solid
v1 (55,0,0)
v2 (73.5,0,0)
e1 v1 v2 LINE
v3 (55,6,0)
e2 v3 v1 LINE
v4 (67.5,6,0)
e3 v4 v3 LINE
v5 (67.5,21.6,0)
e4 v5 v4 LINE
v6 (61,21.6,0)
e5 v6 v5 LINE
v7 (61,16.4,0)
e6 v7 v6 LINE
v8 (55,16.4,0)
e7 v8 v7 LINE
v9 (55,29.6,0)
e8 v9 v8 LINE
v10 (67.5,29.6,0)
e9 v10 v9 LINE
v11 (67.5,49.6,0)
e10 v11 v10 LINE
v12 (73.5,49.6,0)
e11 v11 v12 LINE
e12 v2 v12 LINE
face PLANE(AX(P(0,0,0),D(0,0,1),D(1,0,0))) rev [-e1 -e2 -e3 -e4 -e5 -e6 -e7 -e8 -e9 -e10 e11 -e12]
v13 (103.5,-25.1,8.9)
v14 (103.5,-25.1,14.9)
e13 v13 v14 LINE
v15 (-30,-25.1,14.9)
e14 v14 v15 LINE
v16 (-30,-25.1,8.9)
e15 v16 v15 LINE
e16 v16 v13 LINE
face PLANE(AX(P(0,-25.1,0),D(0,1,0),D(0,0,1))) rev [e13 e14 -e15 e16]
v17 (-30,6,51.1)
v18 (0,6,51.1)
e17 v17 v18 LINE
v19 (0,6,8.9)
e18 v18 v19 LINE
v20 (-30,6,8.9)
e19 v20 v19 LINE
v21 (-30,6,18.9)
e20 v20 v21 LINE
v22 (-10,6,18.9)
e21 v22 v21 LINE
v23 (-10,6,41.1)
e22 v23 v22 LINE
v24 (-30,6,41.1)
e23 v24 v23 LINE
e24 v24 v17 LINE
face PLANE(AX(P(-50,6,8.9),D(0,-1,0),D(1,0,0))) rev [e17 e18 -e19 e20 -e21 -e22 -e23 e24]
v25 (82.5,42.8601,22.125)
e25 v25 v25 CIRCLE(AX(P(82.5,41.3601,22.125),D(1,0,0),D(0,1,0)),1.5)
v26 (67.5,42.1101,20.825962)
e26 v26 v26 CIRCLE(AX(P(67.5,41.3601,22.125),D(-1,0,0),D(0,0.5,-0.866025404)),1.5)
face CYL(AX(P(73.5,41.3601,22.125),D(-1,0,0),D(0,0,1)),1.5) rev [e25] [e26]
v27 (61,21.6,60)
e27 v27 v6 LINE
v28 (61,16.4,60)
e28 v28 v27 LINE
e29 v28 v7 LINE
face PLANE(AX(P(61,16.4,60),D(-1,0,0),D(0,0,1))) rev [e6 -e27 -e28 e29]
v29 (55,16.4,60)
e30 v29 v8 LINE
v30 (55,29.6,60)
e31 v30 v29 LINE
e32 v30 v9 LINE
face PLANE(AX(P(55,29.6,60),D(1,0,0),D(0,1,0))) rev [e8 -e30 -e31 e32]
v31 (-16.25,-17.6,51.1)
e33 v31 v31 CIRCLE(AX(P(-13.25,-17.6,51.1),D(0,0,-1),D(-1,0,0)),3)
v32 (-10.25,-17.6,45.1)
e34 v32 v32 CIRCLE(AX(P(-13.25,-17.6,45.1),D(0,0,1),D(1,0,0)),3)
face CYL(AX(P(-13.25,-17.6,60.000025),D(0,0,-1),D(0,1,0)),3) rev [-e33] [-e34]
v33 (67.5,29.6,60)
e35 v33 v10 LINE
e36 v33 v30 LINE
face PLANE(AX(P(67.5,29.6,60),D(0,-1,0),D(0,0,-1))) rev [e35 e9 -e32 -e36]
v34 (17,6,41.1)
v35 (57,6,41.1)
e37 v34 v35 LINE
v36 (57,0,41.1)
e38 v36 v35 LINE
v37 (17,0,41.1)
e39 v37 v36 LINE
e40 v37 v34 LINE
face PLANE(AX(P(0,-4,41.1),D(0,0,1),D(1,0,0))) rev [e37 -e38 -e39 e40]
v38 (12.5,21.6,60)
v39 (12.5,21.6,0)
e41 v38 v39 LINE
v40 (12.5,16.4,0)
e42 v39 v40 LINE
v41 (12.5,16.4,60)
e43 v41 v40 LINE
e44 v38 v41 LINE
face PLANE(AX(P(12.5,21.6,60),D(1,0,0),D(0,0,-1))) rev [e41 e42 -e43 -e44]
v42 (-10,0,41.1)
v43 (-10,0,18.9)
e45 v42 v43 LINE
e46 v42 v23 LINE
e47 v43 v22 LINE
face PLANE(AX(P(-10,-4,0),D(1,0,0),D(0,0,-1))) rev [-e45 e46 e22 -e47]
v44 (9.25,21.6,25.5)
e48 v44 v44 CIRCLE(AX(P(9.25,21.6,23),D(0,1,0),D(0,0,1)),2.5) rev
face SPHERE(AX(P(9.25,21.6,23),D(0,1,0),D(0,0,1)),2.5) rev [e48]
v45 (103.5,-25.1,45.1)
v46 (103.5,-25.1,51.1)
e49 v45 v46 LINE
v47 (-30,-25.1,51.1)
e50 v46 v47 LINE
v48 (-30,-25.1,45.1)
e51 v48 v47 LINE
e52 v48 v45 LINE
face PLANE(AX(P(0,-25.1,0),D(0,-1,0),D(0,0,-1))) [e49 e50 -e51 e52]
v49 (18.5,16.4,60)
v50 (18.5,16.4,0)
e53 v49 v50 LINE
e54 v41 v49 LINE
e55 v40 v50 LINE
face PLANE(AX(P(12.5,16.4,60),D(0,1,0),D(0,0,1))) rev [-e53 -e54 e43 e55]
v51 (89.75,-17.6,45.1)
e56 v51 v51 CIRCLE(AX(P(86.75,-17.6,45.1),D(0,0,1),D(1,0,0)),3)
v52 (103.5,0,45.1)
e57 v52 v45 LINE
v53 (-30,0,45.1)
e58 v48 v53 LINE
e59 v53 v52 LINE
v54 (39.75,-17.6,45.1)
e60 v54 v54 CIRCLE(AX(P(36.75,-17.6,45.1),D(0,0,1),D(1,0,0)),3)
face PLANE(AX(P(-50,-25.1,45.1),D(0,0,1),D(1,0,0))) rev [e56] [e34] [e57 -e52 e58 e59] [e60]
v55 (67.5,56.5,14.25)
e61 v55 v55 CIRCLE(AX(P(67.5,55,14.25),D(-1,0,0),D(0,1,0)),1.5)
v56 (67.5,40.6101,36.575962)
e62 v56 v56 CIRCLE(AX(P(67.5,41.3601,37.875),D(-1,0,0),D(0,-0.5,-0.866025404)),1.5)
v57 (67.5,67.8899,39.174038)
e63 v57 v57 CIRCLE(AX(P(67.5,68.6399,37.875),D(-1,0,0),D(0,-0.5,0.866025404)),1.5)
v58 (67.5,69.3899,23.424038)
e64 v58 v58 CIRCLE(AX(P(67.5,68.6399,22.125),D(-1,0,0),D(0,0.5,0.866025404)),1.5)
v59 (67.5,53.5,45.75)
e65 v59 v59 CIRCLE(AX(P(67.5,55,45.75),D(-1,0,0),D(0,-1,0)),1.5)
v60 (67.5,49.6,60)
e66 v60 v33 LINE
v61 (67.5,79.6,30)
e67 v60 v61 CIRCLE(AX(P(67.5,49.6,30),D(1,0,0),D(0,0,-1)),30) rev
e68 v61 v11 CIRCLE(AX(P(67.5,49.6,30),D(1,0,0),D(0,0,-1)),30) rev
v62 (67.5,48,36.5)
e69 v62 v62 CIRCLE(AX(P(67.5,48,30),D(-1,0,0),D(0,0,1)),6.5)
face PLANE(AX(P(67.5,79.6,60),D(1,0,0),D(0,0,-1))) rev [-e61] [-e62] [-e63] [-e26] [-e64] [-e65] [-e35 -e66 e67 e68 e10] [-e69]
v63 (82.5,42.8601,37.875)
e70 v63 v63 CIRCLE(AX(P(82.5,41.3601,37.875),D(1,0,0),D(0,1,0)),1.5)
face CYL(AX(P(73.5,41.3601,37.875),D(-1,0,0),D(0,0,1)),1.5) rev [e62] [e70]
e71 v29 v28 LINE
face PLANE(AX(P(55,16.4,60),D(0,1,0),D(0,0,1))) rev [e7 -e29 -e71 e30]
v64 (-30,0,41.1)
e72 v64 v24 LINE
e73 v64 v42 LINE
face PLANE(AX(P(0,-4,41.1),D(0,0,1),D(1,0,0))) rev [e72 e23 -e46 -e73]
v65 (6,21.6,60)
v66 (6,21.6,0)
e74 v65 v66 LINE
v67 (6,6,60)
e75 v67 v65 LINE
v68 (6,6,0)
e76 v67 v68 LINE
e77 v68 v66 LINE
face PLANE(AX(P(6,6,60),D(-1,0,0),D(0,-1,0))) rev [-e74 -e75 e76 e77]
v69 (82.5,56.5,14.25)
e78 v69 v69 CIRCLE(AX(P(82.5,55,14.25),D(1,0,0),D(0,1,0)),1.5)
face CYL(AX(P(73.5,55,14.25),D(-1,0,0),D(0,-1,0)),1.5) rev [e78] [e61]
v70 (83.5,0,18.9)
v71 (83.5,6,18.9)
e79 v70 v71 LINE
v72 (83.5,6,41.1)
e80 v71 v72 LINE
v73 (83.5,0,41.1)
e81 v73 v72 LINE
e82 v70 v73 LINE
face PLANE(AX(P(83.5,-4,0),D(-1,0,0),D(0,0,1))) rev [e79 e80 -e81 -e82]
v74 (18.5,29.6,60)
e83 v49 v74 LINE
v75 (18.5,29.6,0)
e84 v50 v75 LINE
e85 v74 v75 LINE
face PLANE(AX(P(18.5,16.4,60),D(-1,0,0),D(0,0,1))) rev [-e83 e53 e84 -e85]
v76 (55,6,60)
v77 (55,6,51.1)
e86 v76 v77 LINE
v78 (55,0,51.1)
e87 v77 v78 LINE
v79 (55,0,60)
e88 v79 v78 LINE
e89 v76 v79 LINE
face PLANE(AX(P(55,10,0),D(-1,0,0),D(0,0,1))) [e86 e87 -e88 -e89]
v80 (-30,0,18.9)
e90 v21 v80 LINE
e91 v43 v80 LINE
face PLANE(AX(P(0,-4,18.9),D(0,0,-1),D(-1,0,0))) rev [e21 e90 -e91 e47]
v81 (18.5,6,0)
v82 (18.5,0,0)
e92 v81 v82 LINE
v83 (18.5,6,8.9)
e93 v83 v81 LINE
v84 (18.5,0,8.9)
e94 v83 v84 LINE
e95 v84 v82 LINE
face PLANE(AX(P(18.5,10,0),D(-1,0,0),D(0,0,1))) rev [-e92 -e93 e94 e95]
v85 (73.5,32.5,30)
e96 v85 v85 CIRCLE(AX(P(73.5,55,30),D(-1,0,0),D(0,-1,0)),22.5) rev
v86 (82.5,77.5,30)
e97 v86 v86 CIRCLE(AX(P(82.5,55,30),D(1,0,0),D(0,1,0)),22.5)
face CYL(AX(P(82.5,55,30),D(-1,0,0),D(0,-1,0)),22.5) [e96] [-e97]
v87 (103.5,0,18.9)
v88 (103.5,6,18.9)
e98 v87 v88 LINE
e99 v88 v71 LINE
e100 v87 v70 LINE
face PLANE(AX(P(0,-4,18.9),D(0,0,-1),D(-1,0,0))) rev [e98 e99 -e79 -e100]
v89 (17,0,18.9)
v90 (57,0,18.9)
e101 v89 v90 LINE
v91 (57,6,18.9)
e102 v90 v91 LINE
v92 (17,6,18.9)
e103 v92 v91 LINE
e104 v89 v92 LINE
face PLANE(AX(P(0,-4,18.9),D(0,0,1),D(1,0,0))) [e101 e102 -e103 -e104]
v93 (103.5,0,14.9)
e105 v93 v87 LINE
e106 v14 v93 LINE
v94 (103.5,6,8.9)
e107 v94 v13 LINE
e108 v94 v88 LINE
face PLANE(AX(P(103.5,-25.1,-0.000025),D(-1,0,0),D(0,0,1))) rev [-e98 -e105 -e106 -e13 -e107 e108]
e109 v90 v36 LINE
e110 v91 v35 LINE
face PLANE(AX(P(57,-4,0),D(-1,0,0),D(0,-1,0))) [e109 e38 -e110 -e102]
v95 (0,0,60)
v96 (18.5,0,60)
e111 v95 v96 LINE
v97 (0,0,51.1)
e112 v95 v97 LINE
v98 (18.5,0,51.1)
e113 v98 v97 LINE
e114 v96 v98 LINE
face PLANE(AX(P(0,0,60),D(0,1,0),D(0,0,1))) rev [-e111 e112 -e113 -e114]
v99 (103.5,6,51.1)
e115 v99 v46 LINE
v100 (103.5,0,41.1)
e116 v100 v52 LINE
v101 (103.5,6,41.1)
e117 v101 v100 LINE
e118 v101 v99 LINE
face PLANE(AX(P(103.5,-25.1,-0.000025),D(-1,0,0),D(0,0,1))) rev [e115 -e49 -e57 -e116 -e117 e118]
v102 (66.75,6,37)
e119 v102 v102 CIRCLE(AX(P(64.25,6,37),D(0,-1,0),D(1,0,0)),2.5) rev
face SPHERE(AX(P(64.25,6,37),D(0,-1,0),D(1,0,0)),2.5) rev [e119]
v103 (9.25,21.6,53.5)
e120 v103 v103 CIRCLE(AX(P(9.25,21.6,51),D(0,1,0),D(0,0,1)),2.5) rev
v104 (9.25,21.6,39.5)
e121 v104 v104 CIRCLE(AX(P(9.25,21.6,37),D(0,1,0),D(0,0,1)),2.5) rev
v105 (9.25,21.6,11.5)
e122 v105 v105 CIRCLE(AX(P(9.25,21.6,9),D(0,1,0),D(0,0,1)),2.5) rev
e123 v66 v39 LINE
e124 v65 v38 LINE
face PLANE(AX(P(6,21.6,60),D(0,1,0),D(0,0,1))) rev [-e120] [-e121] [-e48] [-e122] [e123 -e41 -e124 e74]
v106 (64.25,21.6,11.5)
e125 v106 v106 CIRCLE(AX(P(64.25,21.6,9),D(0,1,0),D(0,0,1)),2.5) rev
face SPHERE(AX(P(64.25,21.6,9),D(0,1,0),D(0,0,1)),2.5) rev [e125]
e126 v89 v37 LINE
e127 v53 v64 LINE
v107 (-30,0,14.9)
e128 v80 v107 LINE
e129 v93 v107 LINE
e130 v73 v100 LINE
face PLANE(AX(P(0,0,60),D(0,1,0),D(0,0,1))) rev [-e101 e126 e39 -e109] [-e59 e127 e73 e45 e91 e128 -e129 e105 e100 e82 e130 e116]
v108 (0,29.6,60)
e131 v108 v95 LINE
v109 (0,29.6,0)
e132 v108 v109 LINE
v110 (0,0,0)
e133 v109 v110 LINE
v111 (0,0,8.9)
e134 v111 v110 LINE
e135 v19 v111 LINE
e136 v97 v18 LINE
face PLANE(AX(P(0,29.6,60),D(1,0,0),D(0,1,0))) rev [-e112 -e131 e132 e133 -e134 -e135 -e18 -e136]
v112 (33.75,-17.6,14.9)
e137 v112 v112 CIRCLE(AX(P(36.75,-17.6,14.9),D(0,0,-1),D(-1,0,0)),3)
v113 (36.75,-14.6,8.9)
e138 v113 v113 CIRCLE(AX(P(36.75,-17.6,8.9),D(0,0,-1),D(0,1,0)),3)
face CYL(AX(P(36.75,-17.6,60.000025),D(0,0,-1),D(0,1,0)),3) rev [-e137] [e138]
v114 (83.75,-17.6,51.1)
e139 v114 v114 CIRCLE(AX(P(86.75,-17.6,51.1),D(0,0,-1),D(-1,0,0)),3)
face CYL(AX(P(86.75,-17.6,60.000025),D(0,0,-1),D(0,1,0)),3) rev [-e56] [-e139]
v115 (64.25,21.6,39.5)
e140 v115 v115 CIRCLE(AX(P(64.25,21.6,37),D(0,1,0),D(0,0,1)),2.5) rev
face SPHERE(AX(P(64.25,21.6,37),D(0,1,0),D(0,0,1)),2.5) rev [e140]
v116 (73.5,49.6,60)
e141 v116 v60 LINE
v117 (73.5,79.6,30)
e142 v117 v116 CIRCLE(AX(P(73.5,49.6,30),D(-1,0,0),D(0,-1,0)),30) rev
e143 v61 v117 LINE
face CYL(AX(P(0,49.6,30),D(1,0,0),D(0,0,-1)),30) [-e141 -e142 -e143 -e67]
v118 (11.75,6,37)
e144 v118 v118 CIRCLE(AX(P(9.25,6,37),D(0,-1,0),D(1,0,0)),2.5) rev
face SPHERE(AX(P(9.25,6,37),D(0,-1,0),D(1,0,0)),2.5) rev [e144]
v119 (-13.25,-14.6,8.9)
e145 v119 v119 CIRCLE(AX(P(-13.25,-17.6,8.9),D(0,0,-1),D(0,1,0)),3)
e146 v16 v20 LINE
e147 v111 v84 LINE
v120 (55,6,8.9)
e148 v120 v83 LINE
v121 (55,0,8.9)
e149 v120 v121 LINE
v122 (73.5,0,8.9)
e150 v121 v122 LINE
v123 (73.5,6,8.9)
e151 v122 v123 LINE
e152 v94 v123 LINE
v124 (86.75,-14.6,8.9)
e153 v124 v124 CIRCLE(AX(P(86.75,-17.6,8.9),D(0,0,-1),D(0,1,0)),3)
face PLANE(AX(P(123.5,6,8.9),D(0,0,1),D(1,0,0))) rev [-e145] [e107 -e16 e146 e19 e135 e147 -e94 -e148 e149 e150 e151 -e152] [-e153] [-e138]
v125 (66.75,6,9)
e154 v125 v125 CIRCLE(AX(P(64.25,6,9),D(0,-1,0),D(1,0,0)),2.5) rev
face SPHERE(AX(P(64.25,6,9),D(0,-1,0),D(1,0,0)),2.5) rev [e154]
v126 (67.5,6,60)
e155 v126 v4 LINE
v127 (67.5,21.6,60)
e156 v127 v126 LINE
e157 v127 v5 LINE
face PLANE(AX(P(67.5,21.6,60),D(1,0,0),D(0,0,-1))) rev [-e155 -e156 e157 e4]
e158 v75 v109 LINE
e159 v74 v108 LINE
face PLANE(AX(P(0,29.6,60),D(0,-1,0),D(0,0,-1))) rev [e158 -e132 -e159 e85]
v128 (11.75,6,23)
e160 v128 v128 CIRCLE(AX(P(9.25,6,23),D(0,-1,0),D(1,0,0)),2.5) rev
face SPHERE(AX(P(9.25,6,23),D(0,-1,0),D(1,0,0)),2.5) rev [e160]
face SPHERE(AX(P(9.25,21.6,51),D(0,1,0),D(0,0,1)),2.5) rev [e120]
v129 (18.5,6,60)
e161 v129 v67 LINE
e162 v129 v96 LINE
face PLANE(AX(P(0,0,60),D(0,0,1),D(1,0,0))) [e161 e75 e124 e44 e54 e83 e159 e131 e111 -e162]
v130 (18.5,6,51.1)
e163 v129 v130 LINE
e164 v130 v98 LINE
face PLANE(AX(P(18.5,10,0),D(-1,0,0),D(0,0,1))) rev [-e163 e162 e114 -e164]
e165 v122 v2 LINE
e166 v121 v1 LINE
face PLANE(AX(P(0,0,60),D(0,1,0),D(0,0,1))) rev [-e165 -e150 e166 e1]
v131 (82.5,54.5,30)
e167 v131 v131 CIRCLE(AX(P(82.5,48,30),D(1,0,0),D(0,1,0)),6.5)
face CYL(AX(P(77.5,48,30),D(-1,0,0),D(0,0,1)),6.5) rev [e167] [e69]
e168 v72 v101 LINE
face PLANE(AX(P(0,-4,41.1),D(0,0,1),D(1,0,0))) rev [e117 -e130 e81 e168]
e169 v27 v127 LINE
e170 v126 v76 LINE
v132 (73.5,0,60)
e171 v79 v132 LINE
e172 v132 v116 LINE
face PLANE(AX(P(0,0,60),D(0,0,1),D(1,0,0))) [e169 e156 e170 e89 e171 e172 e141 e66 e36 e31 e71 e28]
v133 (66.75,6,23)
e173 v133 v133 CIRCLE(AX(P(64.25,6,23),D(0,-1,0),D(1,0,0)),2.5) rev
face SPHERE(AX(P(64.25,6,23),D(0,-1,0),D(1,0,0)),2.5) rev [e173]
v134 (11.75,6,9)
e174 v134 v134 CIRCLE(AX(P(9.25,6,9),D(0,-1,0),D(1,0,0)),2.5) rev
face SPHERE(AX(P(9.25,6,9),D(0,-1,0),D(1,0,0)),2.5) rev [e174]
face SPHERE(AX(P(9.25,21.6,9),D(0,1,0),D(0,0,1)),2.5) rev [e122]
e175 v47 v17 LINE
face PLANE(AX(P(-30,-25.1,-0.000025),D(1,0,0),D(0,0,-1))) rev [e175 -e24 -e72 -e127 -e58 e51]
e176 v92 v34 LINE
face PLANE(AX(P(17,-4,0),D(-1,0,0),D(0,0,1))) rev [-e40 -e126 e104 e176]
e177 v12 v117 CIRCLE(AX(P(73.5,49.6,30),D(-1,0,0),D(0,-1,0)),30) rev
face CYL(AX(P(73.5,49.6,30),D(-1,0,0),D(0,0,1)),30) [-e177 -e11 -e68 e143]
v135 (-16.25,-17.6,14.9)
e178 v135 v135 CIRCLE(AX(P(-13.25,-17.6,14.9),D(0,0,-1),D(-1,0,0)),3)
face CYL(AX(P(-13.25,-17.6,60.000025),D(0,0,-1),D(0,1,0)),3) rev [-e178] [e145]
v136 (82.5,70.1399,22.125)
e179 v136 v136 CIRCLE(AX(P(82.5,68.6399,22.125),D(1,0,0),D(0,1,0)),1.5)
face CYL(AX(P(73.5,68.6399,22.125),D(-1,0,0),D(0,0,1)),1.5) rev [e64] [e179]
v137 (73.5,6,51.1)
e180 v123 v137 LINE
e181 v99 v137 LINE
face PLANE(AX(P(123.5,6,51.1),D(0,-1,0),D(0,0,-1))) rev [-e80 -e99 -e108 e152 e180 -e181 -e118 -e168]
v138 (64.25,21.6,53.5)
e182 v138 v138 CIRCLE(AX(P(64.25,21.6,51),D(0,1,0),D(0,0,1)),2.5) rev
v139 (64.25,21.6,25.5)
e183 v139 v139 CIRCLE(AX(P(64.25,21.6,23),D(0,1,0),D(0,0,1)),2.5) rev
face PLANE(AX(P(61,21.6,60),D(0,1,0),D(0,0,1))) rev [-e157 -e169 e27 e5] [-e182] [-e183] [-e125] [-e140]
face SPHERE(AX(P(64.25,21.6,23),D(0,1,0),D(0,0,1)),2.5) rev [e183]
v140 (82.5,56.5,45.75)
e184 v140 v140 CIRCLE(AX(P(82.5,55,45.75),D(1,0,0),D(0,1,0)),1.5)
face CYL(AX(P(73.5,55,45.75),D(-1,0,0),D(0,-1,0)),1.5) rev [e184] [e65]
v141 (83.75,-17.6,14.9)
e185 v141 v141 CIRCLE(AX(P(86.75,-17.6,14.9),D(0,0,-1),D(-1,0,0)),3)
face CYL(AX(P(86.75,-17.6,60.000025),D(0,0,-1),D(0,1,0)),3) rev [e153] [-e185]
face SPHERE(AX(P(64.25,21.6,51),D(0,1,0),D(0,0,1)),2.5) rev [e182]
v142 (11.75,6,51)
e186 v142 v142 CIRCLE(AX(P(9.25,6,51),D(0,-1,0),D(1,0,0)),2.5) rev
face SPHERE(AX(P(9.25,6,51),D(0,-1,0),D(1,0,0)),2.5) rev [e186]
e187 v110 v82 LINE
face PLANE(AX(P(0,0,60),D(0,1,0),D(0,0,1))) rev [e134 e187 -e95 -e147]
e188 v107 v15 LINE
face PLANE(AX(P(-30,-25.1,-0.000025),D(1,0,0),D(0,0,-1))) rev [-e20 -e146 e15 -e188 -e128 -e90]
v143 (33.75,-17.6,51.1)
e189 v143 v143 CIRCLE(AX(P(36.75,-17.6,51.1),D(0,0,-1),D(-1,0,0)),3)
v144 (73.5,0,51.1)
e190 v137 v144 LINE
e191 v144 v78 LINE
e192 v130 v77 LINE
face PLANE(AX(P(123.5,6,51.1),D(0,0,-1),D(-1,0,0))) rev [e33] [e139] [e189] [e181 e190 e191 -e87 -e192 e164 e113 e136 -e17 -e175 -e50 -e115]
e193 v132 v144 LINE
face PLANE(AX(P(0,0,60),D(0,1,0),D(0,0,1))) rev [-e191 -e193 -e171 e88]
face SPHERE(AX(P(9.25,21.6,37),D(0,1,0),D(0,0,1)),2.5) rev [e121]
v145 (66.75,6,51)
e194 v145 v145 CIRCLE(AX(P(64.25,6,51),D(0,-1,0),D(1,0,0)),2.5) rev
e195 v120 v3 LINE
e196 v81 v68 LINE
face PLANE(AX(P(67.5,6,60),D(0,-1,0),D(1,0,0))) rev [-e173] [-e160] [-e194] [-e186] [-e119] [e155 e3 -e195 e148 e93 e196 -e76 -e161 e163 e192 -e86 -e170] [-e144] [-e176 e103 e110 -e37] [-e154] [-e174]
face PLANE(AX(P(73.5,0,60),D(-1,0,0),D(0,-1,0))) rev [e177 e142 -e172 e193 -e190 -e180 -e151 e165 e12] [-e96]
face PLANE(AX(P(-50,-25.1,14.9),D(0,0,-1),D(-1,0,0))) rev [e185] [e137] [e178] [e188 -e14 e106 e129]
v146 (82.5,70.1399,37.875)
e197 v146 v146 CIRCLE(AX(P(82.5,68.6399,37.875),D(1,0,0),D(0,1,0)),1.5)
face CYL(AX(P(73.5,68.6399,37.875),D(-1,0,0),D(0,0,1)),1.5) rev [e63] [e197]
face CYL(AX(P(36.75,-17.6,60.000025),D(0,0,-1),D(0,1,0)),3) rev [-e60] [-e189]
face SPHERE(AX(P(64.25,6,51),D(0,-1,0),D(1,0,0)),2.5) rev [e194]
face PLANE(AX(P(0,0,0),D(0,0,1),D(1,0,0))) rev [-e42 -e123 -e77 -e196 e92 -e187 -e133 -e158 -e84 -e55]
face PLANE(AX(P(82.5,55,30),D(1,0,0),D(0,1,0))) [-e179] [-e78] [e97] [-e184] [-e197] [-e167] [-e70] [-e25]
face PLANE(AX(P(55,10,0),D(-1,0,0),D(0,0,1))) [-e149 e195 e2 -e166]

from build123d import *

# Parameters (mm, degrees)
BOSS_EXTRUDE1_DEPTH  = 60
SKETCH2_R            = 1.5
CUT_EXTRUDE1_DEPTH   = 6
LPATTERN1_COUNT      = 4
LPATTERN1_PITCH      = 14
LPATTERN1_COUNT_DIR2 = 2
LPATTERN1_PITCH_DIR2 = 55
SKETCH4_W            = 42.2
SKETCH4_H            = 6
BOSS_EXTRUDE2_DEPTH  = 50
SKETCH5_W            = 42.2
SKETCH5_H            = 6
BOSS_EXTRUDE3_DEPTH  = 50
SKETCH6_W            = 173.5
SKETCH6_H            = 6
BOSS_EXTRUDE4_DEPTH  = 25.1
CIRPATTERN2_COUNT    = 6
SKETCH10_R           = 6.5
CUT_EXTRUDE4_DEPTH   = 10
SKETCH11_R           = 22.5
SKETCH11_R_2         = 1.5
SKETCH11_R_3         = 6.5
BOSS_EXTRUDE6_DEPTH  = 9
SKETCH12_R           = 3
CUT_EXTRUDE5_DEPTH   = 156.56227049
SKETCH13_W           = 30
SKETCH13_H           = 22.2
CUT_EXTRUDE6_DEPTH   = 10
SKETCH14_W           = 40
SKETCH14_H           = 22.2
CUT_EXTRUDE7_DEPTH   = 10
FILLET1_R            = 30
SKETCH15_W           = 36.5
SKETCH15_H           = 8.9
CUT_EXTRUDE8_DEPTH   = 10
SKETCH16_W           = 20
SKETCH16_H           = 31.1
CUT_EXTRUDE9_DEPTH   = 156.56227049


with BuildPart() as part:
    # Sketch1 → Boss-Extrude1 (new body)
    with BuildSketch(Plane.XY):
        Polygon((0, 29.6), (0, 0), (73.5, 0), (73.5, 79.6), (67.5, 79.6), (67.5, 29.6), (55, 29.6), (55, 16.4), (61, 16.4), (61, 21.6), (67.5, 21.6), (67.5, 6), (6, 6), (6, 21.6), (12.5, 21.6), (12.5, 16.4), (18.5, 16.4), (18.5, 29.6), align=None)
    extrude(amount=BOSS_EXTRUDE1_DEPTH)

    # Sketch2 → Cut-Extrude1 (cut)
    with BuildSketch(Plane.ZY.offset(-67.5)):
        with Locations(Location((45.75, 55, 0), (0, 0, 270))):
            Circle(SKETCH2_R)
    cut_extrude1 = extrude(amount=-CUT_EXTRUDE1_DEPTH, mode=Mode.SUBTRACT)

    # Sketch3 → Cut-Revolve1 (revolve, cut)
    with BuildSketch(Plane.XZ.offset(-21.6)):
        with BuildLine():
            Line((61.75, 51), (66.75, 51))
            ThreePointArc((66.75, 51), (64.25, 53.5), (61.75, 51))
        make_face()
    cut_revolve1 = revolve(axis=Axis((61.75, 21.6, 51), (1, 0, 0)), mode=Mode.SUBTRACT)

    # LPattern1: Cut-Revolve1 4 × 2
    with Locations(*[(-j * LPATTERN1_PITCH_DIR2, 0, -i * LPATTERN1_PITCH) for i in range(LPATTERN1_COUNT) for j in range(LPATTERN1_COUNT_DIR2) if (i, j) != (0, 0)]):
        add(cut_revolve1, mode=Mode.SUBTRACT)

    # Sketch4 → Boss-Extrude2 (add)
    with BuildSketch(Plane(origin=(73.5, 0, 0), x_dir=(0, 0, -1), z_dir=(1, 0, 0))):
        with Locations((-30, 3)):
            Rectangle(SKETCH4_W, SKETCH4_H)
    extrude(amount=BOSS_EXTRUDE2_DEPTH)

    # Sketch5 → Boss-Extrude3 (add)
    with BuildSketch(Plane.ZY):
        with Locations((30, 3)):
            Rectangle(SKETCH5_W, SKETCH5_H)
    extrude(amount=BOSS_EXTRUDE3_DEPTH)

    # Sketch6 → Boss-Extrude4 (add)
    with BuildSketch(Plane.XZ):
        with Locations((36.75, 48.1)):
            Rectangle(SKETCH6_W, SKETCH6_H)
        with Locations((36.75, 11.9)):
            Rectangle(SKETCH6_W, SKETCH6_H)
    extrude(amount=BOSS_EXTRUDE4_DEPTH)

    # CirPattern2: Cut-Extrude1 ×6 about axis
    cirpattern2_axis = Axis((0, 55, 30), (1, 0, 0))
    for i in range(1, CIRPATTERN2_COUNT):
        add(cut_extrude1.rotate(cirpattern2_axis, i * 360 / CIRPATTERN2_COUNT), mode=Mode.SUBTRACT)

    # Sketch10 → Cut-Extrude4 (cut)
    with BuildSketch(Plane.ZY.offset(-67.5)):
        with Locations((30, 48)):
            Circle(SKETCH10_R)
    extrude(amount=-CUT_EXTRUDE4_DEPTH, mode=Mode.SUBTRACT)

    # Sketch11 → Boss-Extrude6 (add)
    with BuildSketch(Plane(origin=(73.5, 0, 0), x_dir=(0, 0, -1), z_dir=(1, 0, 0))):
        with Locations(Location((-30, 55, 0), (0, 0, 270))):
            Circle(SKETCH11_R)
        with Locations(Location((-37.875, 68.63990011, 0), (0, 0, 210))):
            Circle(SKETCH11_R_2, mode=Mode.SUBTRACT)
        with Locations(Location((-22.125, 68.63990011, 0), (0, 0, 150))):
            Circle(SKETCH11_R_2, mode=Mode.SUBTRACT)
        with Locations(Location((-14.25, 55, 0), (0, 0, 90))):
            Circle(SKETCH11_R_2, mode=Mode.SUBTRACT)
        with Locations(Location((-22.125, 41.36009989, 0), (0, 0, 90))):
            Circle(SKETCH11_R_2, mode=Mode.SUBTRACT)
        with Locations(Location((-30, 48, 0), (0, 0, 180))):
            Circle(SKETCH11_R_3, mode=Mode.SUBTRACT)
        with Locations(Location((-37.875, 41.36009989, 0), (0, 0, 90))):
            Circle(SKETCH11_R_2, mode=Mode.SUBTRACT)
        with Locations(Location((-45.75, 55, 0), (0, 0, 270))):
            Circle(SKETCH11_R_2, mode=Mode.SUBTRACT)
    extrude(amount=BOSS_EXTRUDE6_DEPTH)

    # Sketch12 → Cut-Extrude5 (cut, through all)
    with BuildSketch(Plane(origin=(0, 0, 8.9), x_dir=(-1, 0, 0), z_dir=(0, 0, -1))):
        with Locations(Location((-36.75, -17.6, 0), (0, 0, 90))):
            Circle(SKETCH12_R)
        with Locations(Location((-86.75, -17.6, 0), (0, 0, 90))):
            Circle(SKETCH12_R)
        with Locations(Location((13.25, -17.6, 0), (0, 0, 90))):
            Circle(SKETCH12_R)
    extrude(amount=-CUT_EXTRUDE5_DEPTH, mode=Mode.SUBTRACT)

    # Mirror2: Cut-Revolve1 across plane
    add(cut_revolve1.mirror(Plane(origin=(0, 13.8, 0), x_dir=(0, 0, 1), z_dir=(0, -1, 0))), mode=Mode.SUBTRACT)

    # Mirror2 copy 1 sketch → Mirror2 copy 1 (revolve, cut)
    with BuildSketch(Plane(origin=(-55, 6, 0), x_dir=(1, 0, 0), z_dir=(0, 1, 0))):
        with BuildLine():
            Line((61.75, -51), (66.75, -51))
            ThreePointArc((66.75, -51), (64.25, -53.5), (61.75, -51))
        make_face()
    revolve(axis=Axis((6.75, 6, 51), (-1, 0, 0)), mode=Mode.SUBTRACT)

    # Mirror2 copy 2 sketch → Mirror2 copy 2 (revolve, cut)
    with BuildSketch(Plane(origin=(0, 6, -14), x_dir=(1, 0, 0), z_dir=(0, 1, 0))):
        with BuildLine():
            Line((61.75, -51), (66.75, -51))
            ThreePointArc((66.75, -51), (64.25, -53.5), (61.75, -51))
        make_face()
    revolve(axis=Axis((61.75, 6, 37), (-1, 0, 0)), mode=Mode.SUBTRACT)

    # Mirror2 copy 3 sketch → Mirror2 copy 3 (revolve, cut)
    with BuildSketch(Plane(origin=(-55, 6, -14), x_dir=(1, 0, 0), z_dir=(0, 1, 0))):
        with BuildLine():
            Line((61.75, -51), (66.75, -51))
            ThreePointArc((66.75, -51), (64.25, -53.5), (61.75, -51))
        make_face()
    revolve(axis=Axis((6.75, 6, 37), (-1, 0, 0)), mode=Mode.SUBTRACT)

    # Mirror2 copy 4 sketch → Mirror2 copy 4 (revolve, cut)
    with BuildSketch(Plane(origin=(0, 6, -28), x_dir=(1, 0, 0), z_dir=(0, 1, 0))):
        with BuildLine():
            Line((61.75, -51), (66.75, -51))
            ThreePointArc((66.75, -51), (64.25, -53.5), (61.75, -51))
        make_face()
    revolve(axis=Axis((61.75, 6, 23), (-1, 0, 0)), mode=Mode.SUBTRACT)

    # Mirror2 copy 5 sketch → Mirror2 copy 5 (revolve, cut)
    with BuildSketch(Plane(origin=(-55, 6, -28), x_dir=(1, 0, 0), z_dir=(0, 1, 0))):
        with BuildLine():
            Line((61.75, -51), (66.75, -51))
            ThreePointArc((66.75, -51), (64.25, -53.5), (61.75, -51))
        make_face()
    revolve(axis=Axis((6.75, 6, 23), (-1, 0, 0)), mode=Mode.SUBTRACT)

    # Mirror2 copy 6 sketch → Mirror2 copy 6 (revolve, cut)
    with BuildSketch(Plane(origin=(0, 6, -42), x_dir=(1, 0, 0), z_dir=(0, 1, 0))):
        with BuildLine():
            Line((61.75, -51), (66.75, -51))
            ThreePointArc((66.75, -51), (64.25, -53.5), (61.75, -51))
        make_face()
    revolve(axis=Axis((61.75, 6, 9), (-1, 0, 0)), mode=Mode.SUBTRACT)

    # Mirror2 copy 7 sketch → Mirror2 copy 7 (revolve, cut)
    with BuildSketch(Plane(origin=(-55, 6, -42), x_dir=(1, 0, 0), z_dir=(0, 1, 0))):
        with BuildLine():
            Line((61.75, -51), (66.75, -51))
            ThreePointArc((66.75, -51), (64.25, -53.5), (61.75, -51))
        make_face()
    revolve(axis=Axis((6.75, 6, 9), (-1, 0, 0)), mode=Mode.SUBTRACT)

    # Sketch13 → Cut-Extrude6 (cut)
    with BuildSketch(Plane(origin=(0, 6, 0), x_dir=(1, 0, 0), z_dir=(0, 1, 0))):
        with Locations((-25, -30)):
            Rectangle(SKETCH13_W, SKETCH13_H)
        with Locations((98.5, -30)):
            Rectangle(SKETCH13_W, SKETCH13_H)
    extrude(amount=-CUT_EXTRUDE6_DEPTH, mode=Mode.SUBTRACT)

    # Sketch14 → Cut-Extrude7 (cut)
    with BuildSketch(Plane(origin=(0, 6, 0), x_dir=(1, 0, 0), z_dir=(0, 1, 0))):
        with Locations((37, -30)):
            Rectangle(SKETCH14_W, SKETCH14_H)
    extrude(amount=-CUT_EXTRUDE7_DEPTH, mode=Mode.SUBTRACT)

    # Fillet1
    fillet1_edges = [part.edges().sort_by_distance(p)[0] for p in [
        (70.5, 79.6, 60),
        (70.5, 79.6, 0),
    ]]
    fillet(fillet1_edges, radius=FILLET1_R - 0.0001)  # a hair under: the kernel refuses the full size

    # Sketch15 → Cut-Extrude8 (cut)
    with BuildSketch(Plane.XZ):
        with Locations((36.75, 55.55)):
            Rectangle(SKETCH15_W, SKETCH15_H)
        with Locations((36.75, 4.45)):
            Rectangle(SKETCH15_W, SKETCH15_H)
    extrude(amount=-CUT_EXTRUDE8_DEPTH, mode=Mode.SUBTRACT)

    # Sketch16 → Cut-Extrude9 (cut, through all)
    with BuildSketch(Plane.XY.offset(51.1)):
        with Locations((-40, -9.55)):
            Rectangle(SKETCH16_W, SKETCH16_H)
        with Locations((113.5, -9.55)):
            Rectangle(SKETCH16_W, SKETCH16_H)
    extrude(amount=-CUT_EXTRUDE9_DEPTH, mode=Mode.SUBTRACT)


solid = part.part
